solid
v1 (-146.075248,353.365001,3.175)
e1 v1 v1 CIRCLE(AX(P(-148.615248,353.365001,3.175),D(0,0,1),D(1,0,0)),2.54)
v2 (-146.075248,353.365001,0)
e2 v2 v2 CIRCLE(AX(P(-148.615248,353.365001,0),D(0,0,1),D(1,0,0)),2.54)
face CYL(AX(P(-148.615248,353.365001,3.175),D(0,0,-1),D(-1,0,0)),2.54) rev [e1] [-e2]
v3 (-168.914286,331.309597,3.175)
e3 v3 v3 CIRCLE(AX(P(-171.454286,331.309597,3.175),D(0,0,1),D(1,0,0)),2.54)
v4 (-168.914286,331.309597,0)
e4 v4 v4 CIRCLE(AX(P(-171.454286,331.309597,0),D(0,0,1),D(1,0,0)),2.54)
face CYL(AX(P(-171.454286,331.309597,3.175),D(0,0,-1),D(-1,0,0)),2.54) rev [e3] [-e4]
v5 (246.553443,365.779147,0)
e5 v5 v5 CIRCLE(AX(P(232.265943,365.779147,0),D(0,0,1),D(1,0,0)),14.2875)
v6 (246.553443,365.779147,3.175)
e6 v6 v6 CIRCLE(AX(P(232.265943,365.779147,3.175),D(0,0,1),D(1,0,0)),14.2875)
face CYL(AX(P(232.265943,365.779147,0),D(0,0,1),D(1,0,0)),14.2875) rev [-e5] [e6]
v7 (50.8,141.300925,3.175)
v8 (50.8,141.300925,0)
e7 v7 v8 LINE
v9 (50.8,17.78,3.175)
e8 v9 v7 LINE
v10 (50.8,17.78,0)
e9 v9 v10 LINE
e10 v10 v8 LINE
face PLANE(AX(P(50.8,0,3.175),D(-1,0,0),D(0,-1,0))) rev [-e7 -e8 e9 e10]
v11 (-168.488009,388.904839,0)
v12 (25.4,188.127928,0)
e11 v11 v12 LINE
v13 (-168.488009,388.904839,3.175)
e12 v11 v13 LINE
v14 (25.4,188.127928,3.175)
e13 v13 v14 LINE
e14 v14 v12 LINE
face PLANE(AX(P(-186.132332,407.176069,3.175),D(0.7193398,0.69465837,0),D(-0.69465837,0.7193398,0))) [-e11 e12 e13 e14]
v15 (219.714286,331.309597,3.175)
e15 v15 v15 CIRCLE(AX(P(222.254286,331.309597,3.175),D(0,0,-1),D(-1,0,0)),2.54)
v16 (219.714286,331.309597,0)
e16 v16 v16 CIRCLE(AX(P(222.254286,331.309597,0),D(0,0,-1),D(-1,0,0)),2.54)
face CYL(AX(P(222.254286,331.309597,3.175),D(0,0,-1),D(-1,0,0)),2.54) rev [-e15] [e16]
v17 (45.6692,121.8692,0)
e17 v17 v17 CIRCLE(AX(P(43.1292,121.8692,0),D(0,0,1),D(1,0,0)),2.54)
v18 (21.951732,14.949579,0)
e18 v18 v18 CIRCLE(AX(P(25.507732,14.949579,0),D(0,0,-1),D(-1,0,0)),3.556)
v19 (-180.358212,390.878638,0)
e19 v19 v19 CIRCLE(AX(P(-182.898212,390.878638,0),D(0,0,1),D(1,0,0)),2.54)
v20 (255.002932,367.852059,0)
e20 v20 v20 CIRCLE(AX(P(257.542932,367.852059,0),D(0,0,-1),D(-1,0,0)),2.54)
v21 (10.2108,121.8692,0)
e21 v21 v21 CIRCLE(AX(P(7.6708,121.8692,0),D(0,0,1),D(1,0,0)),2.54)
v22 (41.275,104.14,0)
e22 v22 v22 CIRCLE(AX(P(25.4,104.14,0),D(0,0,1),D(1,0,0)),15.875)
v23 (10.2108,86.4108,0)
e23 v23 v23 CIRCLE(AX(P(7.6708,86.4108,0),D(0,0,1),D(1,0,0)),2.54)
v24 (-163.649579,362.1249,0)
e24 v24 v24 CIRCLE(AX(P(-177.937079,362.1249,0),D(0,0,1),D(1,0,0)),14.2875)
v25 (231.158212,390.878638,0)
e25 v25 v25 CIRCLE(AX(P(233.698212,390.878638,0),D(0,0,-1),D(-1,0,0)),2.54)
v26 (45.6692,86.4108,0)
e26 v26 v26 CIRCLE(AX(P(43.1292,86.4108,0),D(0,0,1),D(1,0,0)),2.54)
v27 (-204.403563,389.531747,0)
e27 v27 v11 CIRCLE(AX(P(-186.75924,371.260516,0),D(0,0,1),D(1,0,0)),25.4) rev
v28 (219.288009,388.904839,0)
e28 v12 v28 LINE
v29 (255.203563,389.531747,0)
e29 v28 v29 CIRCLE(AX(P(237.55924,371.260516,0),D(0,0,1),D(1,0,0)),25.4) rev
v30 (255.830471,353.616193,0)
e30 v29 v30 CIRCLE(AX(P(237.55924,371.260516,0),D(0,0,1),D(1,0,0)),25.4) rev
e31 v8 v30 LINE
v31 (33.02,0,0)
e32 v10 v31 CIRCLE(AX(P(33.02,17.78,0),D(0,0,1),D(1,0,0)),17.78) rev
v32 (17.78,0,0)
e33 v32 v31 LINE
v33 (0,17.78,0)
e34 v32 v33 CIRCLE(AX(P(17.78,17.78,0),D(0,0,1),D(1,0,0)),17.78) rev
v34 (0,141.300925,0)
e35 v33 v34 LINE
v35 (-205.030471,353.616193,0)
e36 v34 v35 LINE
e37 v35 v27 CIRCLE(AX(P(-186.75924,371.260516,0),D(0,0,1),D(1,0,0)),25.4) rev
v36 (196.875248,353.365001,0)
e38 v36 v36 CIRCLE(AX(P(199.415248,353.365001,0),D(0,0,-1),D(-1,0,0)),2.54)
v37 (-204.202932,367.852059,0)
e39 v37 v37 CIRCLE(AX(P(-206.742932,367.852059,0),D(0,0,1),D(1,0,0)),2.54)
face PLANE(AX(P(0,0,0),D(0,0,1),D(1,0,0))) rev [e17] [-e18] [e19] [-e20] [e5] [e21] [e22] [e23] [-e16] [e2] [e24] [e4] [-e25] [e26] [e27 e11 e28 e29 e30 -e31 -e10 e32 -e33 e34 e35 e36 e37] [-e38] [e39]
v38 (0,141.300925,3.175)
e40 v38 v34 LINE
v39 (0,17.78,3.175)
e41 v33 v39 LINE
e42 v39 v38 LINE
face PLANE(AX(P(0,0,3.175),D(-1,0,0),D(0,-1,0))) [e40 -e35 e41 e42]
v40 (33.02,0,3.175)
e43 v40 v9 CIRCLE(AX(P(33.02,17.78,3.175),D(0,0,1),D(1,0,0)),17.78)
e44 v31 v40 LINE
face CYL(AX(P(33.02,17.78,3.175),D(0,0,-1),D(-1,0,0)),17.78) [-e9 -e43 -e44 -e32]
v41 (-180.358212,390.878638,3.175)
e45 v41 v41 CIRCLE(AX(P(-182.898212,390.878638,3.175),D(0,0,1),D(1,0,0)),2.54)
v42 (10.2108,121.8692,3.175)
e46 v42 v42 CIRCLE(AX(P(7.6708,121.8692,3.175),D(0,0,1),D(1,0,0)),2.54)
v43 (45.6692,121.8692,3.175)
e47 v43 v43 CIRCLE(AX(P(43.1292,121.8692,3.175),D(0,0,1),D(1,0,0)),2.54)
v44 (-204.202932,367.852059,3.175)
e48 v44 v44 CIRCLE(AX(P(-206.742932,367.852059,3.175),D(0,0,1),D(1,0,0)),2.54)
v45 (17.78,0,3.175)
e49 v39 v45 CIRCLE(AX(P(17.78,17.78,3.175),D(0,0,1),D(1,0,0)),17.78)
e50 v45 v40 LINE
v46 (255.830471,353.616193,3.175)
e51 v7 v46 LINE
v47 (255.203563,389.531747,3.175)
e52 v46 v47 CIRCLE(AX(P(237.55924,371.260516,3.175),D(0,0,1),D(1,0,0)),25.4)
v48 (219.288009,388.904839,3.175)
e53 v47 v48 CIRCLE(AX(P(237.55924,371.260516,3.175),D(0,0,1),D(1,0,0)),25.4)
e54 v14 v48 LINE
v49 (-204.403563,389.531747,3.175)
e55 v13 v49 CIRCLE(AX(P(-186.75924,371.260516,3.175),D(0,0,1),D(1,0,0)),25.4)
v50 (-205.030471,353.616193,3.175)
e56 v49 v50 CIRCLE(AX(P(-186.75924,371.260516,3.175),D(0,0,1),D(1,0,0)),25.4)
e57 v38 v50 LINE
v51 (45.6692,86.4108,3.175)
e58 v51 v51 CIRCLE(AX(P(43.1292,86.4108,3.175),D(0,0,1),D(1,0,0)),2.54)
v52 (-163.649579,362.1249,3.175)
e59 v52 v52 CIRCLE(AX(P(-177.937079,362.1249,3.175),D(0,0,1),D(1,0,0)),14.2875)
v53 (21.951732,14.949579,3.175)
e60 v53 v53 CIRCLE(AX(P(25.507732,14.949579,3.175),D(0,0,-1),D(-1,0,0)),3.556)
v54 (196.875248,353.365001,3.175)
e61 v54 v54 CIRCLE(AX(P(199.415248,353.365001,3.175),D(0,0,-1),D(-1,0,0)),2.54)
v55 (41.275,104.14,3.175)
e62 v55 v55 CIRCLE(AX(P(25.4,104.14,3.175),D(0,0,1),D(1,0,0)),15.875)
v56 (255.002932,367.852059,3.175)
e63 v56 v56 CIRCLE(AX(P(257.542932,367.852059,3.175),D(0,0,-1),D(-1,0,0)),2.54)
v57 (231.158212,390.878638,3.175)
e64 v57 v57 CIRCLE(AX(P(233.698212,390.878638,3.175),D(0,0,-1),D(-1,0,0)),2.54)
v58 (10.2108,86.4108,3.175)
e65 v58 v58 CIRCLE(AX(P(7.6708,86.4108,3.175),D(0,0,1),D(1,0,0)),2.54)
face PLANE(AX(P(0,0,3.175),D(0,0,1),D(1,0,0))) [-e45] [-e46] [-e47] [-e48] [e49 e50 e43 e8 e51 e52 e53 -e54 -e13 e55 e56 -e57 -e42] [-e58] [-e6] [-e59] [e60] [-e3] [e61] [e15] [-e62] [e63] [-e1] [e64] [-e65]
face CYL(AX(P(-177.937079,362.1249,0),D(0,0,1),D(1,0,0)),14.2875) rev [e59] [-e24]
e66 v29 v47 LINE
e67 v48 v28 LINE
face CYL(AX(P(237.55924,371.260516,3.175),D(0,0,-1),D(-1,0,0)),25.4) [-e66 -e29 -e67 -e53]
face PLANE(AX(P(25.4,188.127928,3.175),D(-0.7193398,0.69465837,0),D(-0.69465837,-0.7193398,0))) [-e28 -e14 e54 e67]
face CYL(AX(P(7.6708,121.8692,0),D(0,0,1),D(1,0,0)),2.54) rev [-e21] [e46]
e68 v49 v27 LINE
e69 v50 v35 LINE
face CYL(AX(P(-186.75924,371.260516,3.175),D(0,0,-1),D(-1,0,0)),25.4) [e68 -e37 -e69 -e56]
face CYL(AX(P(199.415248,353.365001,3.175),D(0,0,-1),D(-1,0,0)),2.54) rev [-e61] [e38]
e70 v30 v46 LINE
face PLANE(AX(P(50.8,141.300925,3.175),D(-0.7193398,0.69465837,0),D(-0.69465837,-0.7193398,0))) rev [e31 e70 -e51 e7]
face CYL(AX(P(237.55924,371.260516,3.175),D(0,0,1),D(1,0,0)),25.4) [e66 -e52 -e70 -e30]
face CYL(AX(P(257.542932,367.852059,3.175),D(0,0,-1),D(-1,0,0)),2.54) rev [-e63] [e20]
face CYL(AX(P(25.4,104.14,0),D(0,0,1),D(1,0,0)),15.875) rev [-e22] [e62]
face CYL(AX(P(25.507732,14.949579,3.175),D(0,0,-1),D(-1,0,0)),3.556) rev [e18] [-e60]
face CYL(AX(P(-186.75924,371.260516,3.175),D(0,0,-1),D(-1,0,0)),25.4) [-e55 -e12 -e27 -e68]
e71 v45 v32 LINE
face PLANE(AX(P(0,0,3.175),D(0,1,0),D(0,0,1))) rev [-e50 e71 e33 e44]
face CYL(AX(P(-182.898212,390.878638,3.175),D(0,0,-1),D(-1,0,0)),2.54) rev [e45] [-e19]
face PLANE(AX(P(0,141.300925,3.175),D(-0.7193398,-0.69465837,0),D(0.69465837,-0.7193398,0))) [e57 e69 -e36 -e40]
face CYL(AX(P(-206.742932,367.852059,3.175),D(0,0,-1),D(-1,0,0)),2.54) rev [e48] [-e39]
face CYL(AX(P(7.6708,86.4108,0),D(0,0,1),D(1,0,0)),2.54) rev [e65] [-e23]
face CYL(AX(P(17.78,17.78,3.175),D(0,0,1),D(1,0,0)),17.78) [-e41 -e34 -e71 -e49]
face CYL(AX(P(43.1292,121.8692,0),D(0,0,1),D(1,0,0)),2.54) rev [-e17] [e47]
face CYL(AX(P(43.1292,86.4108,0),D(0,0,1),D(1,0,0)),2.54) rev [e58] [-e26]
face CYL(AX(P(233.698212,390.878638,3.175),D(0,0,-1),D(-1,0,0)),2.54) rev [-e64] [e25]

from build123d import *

# Parameters (mm, degrees)
BOSS_EXTRUDE1_DEPTH = 3.175
SKETCH2_R           = 14.2875
SKETCH2_R_2         = 15.875
SKETCH2_R_3         = 2.54
CUT_EXTRUDE1_DEPTH  = 491.500657373
FILLET1_R           = 25.4
SKETCH7_R           = 3.556
CUT_EXTRUDE6_DEPTH  = 476.917284882
FILLET2_R           = 17.78
FILLET3_R           = 17.78
SKETCH9_R           = 2.54
CUT_EXTRUDE7_DEPTH  = 476.917284882


with BuildPart() as part:
    # Sketch1 → Boss-Extrude1 (new body)
    with BuildSketch(Plane.XY):
        Polygon((0, 0), (50.8, 0), (50.8, 141.300925348), (273.474793589, 371.887424227), (236.932331732, 407.176069446), (25.4, 188.127927591), (-186.132331732, 407.176069446), (-222.674793589, 371.887424227), (0, 141.300925348), align=None)
    extrude(amount=BOSS_EXTRUDE1_DEPTH)

    # Sketch2 → Cut-Extrude1 (cut, through all)
    with BuildSketch(Plane.XY.offset(3.175)):
        with Locations((232.265943268, 365.779146629)):
            Circle(SKETCH2_R)
        with Locations((-177.937078746, 362.124900444)):
            Circle(SKETCH2_R)
        with Locations((25.4, 104.14)):
            Circle(SKETCH2_R_2)
        with Locations((43.1292, 121.8692)):
            Circle(SKETCH2_R_3)
        with Locations((7.6708, 121.8692)):
            Circle(SKETCH2_R_3)
        with Locations((7.6708, 86.4108)):
            Circle(SKETCH2_R_3)
        with Locations((43.1292, 86.4108)):
            Circle(SKETCH2_R_3)
    extrude(amount=-CUT_EXTRUDE1_DEPTH, mode=Mode.SUBTRACT)

    # Fillet1
    fillet1_edges = [part.edges().sort_by_distance(p)[0] for p in [
        (273.474793589, 371.887424227, 1.5875),
        (236.932331732, 407.176069446, 1.5875),
        (-222.674793589, 371.887424227, 1.5875),
        (-186.132331732, 407.176069446, 1.5875),
    ]]
    fillet(fillet1_edges, radius=FILLET1_R - 0.0001)  # a hair under: the kernel refuses the full size

    # Sketch7 → Cut-Extrude6 (cut, through all)
    with BuildSketch(Plane(origin=(0, 0, 0), x_dir=(-1, 0, 0), z_dir=(0, 0, -1))):
        with Locations((-25.507732434, 14.949579081)):
            Circle(SKETCH7_R)
    extrude(amount=-CUT_EXTRUDE6_DEPTH, mode=Mode.SUBTRACT)

    # Fillet2
    fillet2_edges = [part.edges().sort_by_distance(p)[0] for p in [
        (0, 0, 1.5875),
    ]]
    fillet(fillet2_edges, radius=FILLET2_R)

    # Fillet3
    fillet3_edges = [part.edges().sort_by_distance(p)[0] for p in [
        (50.8, 0, 1.5875),
    ]]
    fillet(fillet3_edges, radius=FILLET3_R)

    # Sketch9 → Cut-Extrude7 (cut, through all)
    with BuildSketch(Plane(origin=(0, 0, 0), x_dir=(-1, 0, 0), z_dir=(0, 0, -1))):
        with Locations((-233.698211642, 390.878637547)):
            Circle(SKETCH9_R)
        with Locations((-257.542931638, 367.852059109)):
            Circle(SKETCH9_R)
        with Locations((-199.415247758, 353.365000514)):
            Circle(SKETCH9_R)
        with Locations((-222.254286418, 331.309597252)):
            Circle(SKETCH9_R)
    cut_extrude7 = extrude(amount=-CUT_EXTRUDE7_DEPTH, mode=Mode.SUBTRACT)

    # Mirror3: Cut-Extrude7 across plane
    add(cut_extrude7.mirror(Plane.ZY.offset(-25.4)), mode=Mode.SUBTRACT)


solid = part.part
